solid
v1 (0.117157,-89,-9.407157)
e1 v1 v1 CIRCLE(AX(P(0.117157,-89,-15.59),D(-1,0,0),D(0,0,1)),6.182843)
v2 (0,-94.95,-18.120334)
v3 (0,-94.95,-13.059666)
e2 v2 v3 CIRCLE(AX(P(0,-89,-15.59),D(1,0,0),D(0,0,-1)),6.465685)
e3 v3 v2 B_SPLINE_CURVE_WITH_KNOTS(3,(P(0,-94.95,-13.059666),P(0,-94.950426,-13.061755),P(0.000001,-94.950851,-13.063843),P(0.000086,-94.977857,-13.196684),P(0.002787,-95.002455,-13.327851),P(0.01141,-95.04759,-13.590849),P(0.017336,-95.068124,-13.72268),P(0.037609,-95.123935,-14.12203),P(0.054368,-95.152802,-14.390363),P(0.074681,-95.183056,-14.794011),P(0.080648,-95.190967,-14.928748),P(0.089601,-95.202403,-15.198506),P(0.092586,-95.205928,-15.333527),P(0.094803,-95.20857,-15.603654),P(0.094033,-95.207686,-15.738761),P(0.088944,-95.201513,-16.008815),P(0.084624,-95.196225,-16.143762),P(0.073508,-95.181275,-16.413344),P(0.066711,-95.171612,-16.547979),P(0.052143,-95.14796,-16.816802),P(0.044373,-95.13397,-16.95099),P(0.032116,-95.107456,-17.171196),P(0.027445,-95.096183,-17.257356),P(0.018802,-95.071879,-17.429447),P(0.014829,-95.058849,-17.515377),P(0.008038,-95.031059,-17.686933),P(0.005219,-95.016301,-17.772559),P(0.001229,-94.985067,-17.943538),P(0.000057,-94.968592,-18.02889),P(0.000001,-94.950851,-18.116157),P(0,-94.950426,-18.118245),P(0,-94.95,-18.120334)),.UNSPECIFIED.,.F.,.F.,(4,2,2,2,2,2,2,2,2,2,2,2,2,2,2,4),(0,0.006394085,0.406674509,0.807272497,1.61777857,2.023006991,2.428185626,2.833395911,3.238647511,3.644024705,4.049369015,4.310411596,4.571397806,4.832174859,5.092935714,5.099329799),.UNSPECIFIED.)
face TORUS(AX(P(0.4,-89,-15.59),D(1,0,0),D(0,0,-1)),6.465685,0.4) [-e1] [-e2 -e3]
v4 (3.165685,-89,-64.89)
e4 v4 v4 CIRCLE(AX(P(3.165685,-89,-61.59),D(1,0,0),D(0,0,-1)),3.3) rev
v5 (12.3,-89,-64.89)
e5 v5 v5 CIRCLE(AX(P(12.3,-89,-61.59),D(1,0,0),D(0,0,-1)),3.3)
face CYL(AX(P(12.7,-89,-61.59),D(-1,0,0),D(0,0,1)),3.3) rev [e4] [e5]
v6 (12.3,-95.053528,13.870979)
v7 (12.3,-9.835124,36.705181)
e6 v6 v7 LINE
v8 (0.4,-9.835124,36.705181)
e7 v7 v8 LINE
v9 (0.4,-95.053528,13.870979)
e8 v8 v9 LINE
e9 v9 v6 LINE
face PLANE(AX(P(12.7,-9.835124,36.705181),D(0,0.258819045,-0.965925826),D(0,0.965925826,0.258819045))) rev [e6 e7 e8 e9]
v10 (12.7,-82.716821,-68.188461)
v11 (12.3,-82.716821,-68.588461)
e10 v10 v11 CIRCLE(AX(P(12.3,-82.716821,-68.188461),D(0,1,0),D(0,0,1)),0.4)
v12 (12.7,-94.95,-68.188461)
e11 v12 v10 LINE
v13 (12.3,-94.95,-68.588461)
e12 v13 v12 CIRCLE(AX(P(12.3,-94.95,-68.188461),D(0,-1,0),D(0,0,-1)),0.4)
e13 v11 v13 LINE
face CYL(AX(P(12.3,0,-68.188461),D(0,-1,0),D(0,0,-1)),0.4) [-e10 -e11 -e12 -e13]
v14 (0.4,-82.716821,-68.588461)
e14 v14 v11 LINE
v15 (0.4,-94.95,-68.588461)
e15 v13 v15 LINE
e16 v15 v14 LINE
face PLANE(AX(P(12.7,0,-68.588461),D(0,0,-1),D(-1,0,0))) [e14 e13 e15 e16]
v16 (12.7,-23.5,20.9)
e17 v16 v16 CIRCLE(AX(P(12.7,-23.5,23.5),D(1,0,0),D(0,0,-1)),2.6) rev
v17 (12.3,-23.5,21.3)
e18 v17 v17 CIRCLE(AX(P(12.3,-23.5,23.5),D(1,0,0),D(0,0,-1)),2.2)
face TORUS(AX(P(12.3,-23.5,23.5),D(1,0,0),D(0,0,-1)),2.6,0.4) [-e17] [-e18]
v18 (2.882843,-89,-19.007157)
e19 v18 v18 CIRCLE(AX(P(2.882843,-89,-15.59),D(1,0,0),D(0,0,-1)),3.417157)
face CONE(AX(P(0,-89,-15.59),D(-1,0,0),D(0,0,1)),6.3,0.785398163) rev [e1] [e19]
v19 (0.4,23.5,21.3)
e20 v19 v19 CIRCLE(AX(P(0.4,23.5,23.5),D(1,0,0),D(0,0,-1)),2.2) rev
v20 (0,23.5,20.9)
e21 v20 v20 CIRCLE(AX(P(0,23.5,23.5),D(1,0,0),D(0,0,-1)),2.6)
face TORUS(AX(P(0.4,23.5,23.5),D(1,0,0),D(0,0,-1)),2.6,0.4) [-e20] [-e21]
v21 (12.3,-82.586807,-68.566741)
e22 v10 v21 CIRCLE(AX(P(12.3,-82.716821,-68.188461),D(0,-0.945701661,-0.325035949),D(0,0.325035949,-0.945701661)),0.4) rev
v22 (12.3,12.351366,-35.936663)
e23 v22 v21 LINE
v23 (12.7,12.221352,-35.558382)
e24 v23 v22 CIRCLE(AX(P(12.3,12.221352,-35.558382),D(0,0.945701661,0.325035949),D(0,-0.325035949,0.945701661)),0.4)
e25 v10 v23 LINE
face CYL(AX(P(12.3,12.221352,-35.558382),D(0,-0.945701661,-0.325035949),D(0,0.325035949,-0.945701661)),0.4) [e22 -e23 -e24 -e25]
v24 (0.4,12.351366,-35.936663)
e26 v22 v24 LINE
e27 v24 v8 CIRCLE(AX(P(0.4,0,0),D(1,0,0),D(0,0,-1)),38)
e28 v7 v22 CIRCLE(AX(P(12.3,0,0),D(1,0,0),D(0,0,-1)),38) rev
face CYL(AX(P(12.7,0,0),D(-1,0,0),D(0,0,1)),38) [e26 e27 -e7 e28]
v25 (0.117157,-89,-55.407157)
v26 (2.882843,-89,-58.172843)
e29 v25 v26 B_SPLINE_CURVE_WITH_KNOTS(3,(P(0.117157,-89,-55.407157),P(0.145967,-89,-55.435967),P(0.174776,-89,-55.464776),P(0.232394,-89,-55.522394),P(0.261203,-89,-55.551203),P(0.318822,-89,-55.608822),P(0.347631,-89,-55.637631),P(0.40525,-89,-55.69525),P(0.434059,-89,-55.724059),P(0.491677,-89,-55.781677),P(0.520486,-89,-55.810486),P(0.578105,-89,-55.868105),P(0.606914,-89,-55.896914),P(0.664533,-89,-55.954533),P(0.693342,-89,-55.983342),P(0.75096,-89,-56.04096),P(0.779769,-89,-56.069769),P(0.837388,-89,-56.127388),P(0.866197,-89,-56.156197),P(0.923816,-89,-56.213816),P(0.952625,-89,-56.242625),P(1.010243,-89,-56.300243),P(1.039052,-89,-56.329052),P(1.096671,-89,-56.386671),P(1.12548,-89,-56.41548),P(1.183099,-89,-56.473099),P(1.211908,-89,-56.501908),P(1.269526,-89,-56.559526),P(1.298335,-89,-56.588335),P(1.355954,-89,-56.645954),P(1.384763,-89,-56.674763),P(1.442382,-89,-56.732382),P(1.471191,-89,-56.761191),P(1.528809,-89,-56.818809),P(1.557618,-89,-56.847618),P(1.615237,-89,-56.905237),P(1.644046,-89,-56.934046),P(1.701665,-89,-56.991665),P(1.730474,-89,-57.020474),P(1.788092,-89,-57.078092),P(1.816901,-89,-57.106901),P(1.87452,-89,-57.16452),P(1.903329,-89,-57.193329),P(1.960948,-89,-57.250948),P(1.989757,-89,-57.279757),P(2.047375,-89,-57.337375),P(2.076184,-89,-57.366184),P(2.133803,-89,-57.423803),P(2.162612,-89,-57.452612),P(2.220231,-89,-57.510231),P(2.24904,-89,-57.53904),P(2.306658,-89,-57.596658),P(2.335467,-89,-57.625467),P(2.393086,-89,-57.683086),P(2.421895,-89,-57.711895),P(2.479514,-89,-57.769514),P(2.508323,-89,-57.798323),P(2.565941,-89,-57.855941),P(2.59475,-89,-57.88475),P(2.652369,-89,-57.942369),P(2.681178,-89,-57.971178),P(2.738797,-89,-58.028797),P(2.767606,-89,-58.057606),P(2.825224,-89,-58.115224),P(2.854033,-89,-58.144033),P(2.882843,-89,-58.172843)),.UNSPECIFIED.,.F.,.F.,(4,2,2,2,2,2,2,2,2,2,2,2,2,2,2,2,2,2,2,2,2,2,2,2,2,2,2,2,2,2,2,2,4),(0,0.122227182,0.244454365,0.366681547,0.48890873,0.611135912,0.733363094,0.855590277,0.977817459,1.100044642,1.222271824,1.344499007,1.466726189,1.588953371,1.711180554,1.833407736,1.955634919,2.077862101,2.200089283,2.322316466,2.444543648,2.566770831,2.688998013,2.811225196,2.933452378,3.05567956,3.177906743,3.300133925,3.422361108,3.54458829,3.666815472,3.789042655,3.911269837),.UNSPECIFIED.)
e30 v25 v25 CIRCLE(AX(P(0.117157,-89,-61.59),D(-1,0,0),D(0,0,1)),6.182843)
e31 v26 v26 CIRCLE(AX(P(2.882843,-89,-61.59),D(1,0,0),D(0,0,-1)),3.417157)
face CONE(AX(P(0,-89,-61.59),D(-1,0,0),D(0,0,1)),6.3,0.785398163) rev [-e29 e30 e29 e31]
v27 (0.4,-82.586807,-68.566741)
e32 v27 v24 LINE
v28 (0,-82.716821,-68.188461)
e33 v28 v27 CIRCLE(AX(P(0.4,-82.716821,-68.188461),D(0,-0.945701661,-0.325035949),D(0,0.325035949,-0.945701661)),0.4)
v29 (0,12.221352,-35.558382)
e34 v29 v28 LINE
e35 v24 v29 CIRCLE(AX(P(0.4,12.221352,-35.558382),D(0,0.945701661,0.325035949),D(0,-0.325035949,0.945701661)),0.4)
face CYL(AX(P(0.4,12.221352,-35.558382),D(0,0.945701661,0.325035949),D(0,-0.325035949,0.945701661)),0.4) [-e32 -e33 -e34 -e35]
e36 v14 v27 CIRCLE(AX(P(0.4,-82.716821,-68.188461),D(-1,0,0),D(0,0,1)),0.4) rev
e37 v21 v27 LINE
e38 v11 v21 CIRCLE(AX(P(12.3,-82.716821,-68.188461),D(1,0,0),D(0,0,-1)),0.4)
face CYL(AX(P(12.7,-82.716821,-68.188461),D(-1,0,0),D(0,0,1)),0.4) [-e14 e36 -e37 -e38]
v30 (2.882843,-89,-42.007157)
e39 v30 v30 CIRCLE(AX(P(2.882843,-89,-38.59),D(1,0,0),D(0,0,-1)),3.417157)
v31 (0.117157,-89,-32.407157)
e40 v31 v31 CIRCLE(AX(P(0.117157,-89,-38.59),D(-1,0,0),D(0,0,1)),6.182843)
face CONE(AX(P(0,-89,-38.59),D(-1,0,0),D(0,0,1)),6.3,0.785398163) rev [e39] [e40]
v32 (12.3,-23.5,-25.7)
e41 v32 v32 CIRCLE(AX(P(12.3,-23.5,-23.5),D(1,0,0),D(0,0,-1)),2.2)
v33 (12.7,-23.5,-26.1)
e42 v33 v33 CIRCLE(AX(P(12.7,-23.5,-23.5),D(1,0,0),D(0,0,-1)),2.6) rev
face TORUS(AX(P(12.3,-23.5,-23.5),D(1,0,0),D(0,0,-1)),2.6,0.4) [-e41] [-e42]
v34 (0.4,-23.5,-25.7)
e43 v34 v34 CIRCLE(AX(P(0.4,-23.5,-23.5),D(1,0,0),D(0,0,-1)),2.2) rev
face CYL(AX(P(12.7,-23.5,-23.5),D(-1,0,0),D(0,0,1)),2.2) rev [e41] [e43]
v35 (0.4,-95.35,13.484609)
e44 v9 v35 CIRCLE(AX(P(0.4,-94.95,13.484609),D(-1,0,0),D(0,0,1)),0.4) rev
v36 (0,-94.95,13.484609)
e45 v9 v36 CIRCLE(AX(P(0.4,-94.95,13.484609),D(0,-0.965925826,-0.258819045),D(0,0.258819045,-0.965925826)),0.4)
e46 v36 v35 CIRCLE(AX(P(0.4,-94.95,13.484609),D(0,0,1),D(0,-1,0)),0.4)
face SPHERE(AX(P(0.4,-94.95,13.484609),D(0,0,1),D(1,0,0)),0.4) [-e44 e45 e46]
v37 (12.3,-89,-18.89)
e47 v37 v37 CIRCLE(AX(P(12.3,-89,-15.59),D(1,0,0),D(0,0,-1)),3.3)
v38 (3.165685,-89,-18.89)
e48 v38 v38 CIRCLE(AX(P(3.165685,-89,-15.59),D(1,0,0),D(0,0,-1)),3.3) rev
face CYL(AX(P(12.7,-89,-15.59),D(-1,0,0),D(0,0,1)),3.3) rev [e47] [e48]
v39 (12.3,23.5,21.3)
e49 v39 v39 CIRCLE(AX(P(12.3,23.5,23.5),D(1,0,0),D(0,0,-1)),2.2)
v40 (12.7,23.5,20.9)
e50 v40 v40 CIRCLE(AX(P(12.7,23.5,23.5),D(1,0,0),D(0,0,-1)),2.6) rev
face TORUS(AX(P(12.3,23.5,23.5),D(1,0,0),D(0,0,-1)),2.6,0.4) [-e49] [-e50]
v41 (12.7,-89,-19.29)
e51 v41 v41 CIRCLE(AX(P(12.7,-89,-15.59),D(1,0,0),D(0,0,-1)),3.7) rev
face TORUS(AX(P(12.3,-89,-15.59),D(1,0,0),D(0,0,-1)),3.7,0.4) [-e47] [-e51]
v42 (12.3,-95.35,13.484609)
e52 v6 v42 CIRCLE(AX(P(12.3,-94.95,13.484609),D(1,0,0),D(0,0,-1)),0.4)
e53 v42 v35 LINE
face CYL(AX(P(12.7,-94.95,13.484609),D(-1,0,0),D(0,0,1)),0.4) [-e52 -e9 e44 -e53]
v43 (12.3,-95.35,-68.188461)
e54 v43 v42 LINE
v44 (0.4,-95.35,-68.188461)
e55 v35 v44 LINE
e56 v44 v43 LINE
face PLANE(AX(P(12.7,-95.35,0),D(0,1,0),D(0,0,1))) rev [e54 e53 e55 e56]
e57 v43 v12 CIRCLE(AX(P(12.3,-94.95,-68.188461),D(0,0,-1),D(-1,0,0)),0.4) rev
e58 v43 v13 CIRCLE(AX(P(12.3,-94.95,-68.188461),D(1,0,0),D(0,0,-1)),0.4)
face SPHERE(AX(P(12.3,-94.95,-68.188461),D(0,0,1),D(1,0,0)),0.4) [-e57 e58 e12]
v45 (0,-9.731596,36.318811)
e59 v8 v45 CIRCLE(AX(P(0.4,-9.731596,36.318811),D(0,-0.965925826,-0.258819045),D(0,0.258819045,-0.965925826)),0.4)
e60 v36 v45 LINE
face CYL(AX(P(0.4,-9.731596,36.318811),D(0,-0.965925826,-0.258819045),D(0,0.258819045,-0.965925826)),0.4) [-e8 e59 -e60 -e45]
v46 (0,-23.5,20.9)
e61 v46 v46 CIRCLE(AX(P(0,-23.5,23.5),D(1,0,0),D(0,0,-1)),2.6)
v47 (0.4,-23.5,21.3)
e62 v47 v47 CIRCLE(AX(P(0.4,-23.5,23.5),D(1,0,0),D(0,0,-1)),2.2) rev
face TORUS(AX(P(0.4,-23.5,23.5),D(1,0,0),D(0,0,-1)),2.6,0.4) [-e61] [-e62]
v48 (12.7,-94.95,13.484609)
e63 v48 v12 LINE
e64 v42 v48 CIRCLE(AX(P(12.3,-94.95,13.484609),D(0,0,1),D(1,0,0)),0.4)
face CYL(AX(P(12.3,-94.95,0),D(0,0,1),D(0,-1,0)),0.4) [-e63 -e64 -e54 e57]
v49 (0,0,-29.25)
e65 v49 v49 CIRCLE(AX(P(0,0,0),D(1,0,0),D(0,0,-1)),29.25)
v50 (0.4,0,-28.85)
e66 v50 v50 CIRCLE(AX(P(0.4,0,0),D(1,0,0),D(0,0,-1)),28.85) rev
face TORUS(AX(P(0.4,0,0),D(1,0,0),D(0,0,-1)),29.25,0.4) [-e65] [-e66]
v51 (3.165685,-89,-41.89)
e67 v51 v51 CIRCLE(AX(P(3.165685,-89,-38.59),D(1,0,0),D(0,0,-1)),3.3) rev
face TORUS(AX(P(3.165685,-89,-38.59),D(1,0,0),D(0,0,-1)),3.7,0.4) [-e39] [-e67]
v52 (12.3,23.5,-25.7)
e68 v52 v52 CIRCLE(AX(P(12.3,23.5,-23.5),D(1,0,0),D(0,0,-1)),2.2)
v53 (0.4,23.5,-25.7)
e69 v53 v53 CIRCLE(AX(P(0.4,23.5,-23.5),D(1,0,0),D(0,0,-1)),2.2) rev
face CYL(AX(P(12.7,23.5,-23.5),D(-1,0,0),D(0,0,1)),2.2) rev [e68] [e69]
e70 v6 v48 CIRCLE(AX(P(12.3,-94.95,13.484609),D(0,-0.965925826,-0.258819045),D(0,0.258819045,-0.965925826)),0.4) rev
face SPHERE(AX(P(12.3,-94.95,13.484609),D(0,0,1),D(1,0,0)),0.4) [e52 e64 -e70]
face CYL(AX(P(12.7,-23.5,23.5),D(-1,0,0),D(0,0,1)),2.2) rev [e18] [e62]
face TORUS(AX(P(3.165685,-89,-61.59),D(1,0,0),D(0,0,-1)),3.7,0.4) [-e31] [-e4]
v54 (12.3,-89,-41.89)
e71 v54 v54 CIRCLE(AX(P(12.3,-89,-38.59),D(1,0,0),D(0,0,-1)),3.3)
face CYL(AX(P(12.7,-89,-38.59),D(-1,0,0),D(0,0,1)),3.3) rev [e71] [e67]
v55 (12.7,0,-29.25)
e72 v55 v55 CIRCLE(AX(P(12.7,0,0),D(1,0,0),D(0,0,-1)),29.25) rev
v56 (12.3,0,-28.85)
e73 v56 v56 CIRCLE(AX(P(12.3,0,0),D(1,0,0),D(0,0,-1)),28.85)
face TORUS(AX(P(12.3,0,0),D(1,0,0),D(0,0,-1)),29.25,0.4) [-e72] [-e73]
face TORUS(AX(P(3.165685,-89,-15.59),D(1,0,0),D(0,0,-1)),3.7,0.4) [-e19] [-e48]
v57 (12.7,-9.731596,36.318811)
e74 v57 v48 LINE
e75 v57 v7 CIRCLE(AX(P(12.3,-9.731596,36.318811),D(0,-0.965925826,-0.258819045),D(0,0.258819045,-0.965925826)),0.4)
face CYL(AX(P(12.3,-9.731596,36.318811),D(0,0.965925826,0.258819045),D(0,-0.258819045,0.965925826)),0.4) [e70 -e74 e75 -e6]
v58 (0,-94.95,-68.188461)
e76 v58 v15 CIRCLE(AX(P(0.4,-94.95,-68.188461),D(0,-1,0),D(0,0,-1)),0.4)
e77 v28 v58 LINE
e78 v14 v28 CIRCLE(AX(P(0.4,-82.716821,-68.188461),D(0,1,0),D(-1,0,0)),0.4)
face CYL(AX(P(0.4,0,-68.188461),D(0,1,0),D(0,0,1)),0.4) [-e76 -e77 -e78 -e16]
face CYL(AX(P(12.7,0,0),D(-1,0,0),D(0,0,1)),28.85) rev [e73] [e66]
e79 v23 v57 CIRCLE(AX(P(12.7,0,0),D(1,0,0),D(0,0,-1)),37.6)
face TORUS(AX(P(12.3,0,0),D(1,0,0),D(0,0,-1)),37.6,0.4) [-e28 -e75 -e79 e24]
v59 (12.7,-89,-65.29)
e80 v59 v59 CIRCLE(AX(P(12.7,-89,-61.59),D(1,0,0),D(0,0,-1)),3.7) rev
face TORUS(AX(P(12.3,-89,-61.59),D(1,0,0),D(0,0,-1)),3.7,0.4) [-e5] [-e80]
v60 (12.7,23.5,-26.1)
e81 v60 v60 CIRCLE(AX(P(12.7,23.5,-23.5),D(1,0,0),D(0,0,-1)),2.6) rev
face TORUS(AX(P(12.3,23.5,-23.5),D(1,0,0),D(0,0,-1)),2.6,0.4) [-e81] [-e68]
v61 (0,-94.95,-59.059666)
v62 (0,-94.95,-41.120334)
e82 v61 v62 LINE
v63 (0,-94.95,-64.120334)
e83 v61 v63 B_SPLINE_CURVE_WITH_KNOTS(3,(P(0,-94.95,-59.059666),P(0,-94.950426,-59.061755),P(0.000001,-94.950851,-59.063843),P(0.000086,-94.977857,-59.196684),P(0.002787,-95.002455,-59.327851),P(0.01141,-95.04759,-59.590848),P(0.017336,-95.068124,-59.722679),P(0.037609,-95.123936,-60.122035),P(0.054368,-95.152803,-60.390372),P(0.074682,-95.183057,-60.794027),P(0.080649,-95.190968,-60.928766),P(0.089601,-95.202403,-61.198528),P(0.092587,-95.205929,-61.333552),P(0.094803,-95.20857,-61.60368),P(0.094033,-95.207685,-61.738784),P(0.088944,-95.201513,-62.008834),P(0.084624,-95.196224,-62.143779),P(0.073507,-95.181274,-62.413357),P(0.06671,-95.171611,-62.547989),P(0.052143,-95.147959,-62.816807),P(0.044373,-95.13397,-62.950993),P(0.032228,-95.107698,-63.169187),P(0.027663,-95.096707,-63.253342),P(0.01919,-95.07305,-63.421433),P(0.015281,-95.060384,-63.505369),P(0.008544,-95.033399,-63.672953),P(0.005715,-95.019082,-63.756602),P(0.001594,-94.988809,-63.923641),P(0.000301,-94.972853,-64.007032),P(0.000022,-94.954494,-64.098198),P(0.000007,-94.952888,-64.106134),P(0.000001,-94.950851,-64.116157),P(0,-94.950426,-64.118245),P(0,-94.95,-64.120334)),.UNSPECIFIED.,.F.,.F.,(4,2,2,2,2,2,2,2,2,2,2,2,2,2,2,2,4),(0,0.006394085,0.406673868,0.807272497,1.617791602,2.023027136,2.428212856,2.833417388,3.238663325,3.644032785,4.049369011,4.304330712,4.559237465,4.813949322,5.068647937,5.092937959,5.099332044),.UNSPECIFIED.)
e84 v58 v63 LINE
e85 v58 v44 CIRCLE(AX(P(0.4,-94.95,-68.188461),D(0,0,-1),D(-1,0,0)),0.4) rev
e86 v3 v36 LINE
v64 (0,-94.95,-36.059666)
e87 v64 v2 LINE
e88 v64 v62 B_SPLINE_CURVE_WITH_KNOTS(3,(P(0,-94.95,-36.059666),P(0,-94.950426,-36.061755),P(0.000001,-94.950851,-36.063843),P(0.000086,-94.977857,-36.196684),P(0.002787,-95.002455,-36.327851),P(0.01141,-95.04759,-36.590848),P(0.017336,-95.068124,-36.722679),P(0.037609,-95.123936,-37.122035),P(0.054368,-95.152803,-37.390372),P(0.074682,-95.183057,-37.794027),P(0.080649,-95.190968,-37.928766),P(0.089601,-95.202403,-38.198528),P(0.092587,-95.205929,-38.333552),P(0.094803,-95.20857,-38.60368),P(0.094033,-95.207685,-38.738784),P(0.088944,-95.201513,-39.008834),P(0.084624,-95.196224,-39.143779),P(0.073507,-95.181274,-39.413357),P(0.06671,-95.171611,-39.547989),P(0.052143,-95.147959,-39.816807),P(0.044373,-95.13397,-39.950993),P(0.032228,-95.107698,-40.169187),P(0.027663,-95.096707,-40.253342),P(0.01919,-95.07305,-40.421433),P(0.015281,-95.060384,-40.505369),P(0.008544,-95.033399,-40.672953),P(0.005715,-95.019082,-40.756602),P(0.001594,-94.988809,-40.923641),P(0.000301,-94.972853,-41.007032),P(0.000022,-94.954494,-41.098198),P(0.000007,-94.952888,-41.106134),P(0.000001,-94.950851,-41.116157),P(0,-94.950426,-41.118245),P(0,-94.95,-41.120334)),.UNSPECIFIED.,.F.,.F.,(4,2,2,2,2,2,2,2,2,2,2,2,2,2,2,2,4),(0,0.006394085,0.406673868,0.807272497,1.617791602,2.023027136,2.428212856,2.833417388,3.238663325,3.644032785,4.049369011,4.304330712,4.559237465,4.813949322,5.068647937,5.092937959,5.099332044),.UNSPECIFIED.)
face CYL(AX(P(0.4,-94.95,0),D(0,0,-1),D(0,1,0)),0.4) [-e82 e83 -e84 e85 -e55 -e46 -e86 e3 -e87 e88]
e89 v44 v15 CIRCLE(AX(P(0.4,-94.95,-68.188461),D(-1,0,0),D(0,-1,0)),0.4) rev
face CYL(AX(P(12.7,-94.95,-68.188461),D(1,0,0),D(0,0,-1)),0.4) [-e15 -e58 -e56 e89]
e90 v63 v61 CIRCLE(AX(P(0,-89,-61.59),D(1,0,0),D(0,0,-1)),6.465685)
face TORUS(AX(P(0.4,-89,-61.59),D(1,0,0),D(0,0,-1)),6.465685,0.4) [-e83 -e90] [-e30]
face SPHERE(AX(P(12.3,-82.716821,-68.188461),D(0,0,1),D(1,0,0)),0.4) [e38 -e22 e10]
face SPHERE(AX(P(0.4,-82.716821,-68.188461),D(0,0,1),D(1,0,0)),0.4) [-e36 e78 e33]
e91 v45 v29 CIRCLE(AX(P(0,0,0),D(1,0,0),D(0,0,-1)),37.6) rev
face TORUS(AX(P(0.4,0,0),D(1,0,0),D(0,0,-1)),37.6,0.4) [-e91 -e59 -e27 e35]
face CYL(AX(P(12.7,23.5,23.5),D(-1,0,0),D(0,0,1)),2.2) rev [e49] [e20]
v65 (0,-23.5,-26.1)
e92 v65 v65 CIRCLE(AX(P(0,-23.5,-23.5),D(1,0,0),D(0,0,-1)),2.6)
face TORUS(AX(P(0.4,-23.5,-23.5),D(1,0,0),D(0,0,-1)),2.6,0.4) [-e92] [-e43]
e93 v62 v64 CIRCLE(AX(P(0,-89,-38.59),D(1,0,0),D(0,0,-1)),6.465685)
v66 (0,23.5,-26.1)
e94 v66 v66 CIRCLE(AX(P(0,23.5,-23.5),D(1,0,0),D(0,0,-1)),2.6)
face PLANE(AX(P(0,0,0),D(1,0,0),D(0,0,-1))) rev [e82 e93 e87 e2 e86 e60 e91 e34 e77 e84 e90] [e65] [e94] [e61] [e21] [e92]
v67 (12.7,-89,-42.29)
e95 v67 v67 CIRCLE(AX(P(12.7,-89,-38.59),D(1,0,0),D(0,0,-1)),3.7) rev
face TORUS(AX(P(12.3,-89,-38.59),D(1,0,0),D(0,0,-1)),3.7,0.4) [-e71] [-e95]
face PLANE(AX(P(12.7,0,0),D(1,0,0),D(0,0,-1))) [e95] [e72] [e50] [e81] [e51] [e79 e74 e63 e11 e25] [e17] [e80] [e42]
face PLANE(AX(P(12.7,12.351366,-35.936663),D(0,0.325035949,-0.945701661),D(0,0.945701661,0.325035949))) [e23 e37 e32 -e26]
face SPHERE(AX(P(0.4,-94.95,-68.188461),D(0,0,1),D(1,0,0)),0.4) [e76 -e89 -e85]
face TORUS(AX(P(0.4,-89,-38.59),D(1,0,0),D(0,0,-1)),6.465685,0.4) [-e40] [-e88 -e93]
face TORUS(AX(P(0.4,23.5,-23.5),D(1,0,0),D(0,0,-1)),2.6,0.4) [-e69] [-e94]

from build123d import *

# Parameters (mm, degrees)
SKETCH1_R           = 38
SKETCH1_R_2         = 2.2
SKETCH1_R_3         = 28.85
SKETCH1_R_4         = 3.3
BOSS_EXTRUDE1_DEPTH = 12.7
CHAMFER1_SIZE       = 3
FILLET1_R           = 0.4


with BuildPart() as part:
    # Sketch1 → Boss-Extrude1 (new body)
    # profile 1 of 2: a face of its own
    with BuildSketch(Plane(origin=(0, 0, 0), x_dir=(0, 0, -1), z_dir=(1, 0, 0))):
        Circle(SKETCH1_R)
        with Locations((23.5, -23.5)):
            Circle(SKETCH1_R_2, mode=Mode.SUBTRACT)
        with Locations((-23.5, -23.5)):
            Circle(SKETCH1_R_2, mode=Mode.SUBTRACT)
        with Locations((23.5, 23.5)):
            Circle(SKETCH1_R_2, mode=Mode.SUBTRACT)
        with Locations((-23.5, 23.5)):
            Circle(SKETCH1_R_2, mode=Mode.SUBTRACT)
        Circle(SKETCH1_R_3, mode=Mode.SUBTRACT)
    # profile 2 of 2: a face of its own
    with BuildSketch(Plane(origin=(0, 0, 0), x_dir=(0, 0, -1), z_dir=(1, 0, 0))):
        with BuildLine():
            ThreePointArc((38, 0), (4.959995304, -37.674904732), (-36.705181399, -9.835123714))
            Line((-36.705181399, -9.835123714), (-13.791539357, -95.35))
            Line((-13.791539357, -95.35), (68.588460643, -95.35))
            Line((68.588460643, -95.35), (68.588460643, -82.65))
            Line((68.588460643, -82.65), (35.936663125, 12.351366055))
            ThreePointArc((35.936663125, 12.351366055), (37.480616315, 6.261261903), (38, 0))
        make_face()
        with Locations((15.59, -89)):
            Circle(SKETCH1_R_4, mode=Mode.SUBTRACT)
        with Locations((38.59, -89)):
            Circle(SKETCH1_R_4, mode=Mode.SUBTRACT)
        with Locations((61.59, -89)):
            Circle(SKETCH1_R_4, mode=Mode.SUBTRACT)
    extrude(amount=BOSS_EXTRUDE1_DEPTH)

    # Chamfer1
    chamfer1_edges = [part.edges().sort_by_distance(p)[0] for p in [
        (0, -89, -58.29),
        (0, -89, -35.29),
        (0, -89, -12.29),
    ]]
    chamfer(chamfer1_edges, length=CHAMFER1_SIZE)

    # Fillet1
    # the kernel refuses this fillet: 0.4 mm, written as the material it takes off along each edge
    with BuildSketch(Plane(origin=(12.3, -82.716821333, -68.188460643), x_dir=(0, 0, -1), z_dir=(1, 0, 0))) as fillet1_piece_1_section:
        Polygon((0, 0), (FILLET1_R * 1.02, 0), (FILLET1_R * 1.02, FILLET1_R * 0.170394400329), (FILLET1_R * 0.964615694418, FILLET1_R * 0.331536667779), align=None)
    fillet1_piece_1 = extrude(amount=FILLET1_R * 1.02, mode=Mode.PRIVATE)
    fillet1_piece_1 = fillet1_piece_1 - Plane(origin=(12.3, -82.716821333, -68.188460643), x_dir=(0, -0.16477005007846748, 0.9863320083000142), z_dir=(1, 0, 0)) * Sphere(FILLET1_R, mode=Mode.PRIVATE)
    add(fillet1_piece_1, mode=Mode.SUBTRACT)
    with BuildSketch(Plane(origin=(0.4, -94.95, -68.188460643), x_dir=(0, -1, 0), z_dir=(-1, 0, 0))) as fillet1_piece_2_section:
        Polygon((0, 0), (FILLET1_R * 1.02, 0), (FILLET1_R * 1.02, -FILLET1_R * 1.02), (0, -FILLET1_R * 1.02), align=None)
    fillet1_piece_2 = extrude(amount=FILLET1_R * 1.02, mode=Mode.PRIVATE)
    fillet1_piece_2 = fillet1_piece_2 - Plane(origin=(0.4, -94.95, -68.188460643), x_dir=(0, 0.7071067811865476, 0.7071067811865475), z_dir=(-1, 0, 0)) * Sphere(FILLET1_R, mode=Mode.PRIVATE)
    add(fillet1_piece_2, mode=Mode.SUBTRACT)
    with BuildSketch(Plane(origin=(0.4, -82.716821333, -68.188460643), x_dir=(0, 0, -1), z_dir=(-1, 0, 0))) as fillet1_piece_3_section:
        Polygon((0, 0), (FILLET1_R * 1.02, 0), (FILLET1_R * 1.02, -FILLET1_R * 0.170394400329), (FILLET1_R * 0.964615694418, -FILLET1_R * 0.331536667779), align=None)
    fillet1_piece_3 = extrude(amount=FILLET1_R * 1.02, mode=Mode.PRIVATE)
    fillet1_piece_3 = fillet1_piece_3 - Plane(origin=(0.4, -82.716821333, -68.188460643), x_dir=(0, -0.16477005007846748, 0.9863320083000142), z_dir=(-1, 0, 0)) * Sphere(FILLET1_R, mode=Mode.PRIVATE)
    add(fillet1_piece_3, mode=Mode.SUBTRACT)
    with BuildSketch(Plane(origin=(0.4, -94.95, 13.484608562), x_dir=(0, -0.25881904510251824, 0.9659258262890691), z_dir=(-1, 0, 0))) as fillet1_piece_4_section:
        Polygon((0, 0), (FILLET1_R * 1.02, 0), (FILLET1_R * 1.02, -FILLET1_R * 0.782673527739), (FILLET1_R * 0.263995426005, -FILLET1_R * 0.985244342815), align=None)
    fillet1_piece_4 = extrude(amount=FILLET1_R * 1.02, mode=Mode.PRIVATE)
    fillet1_piece_4 = fillet1_piece_4 - Plane(origin=(0.4, -94.95, 13.484608562), x_dir=(0, 0.7933533402912343, -0.6087614290087218), z_dir=(-1, 0, 0)) * Sphere(FILLET1_R, mode=Mode.PRIVATE)
    add(fillet1_piece_4, mode=Mode.SUBTRACT)
    with BuildSketch(Plane(origin=(12.3, -94.95, 13.484608562), x_dir=(0, -0.25881904510251824, 0.9659258262890691), z_dir=(1, 0, 0))) as fillet1_piece_5_section:
        Polygon((0, 0), (FILLET1_R * 1.02, 0), (FILLET1_R * 1.02, FILLET1_R * 0.782673527739), (FILLET1_R * 0.263995426005, FILLET1_R * 0.985244342815), align=None)
    fillet1_piece_5 = extrude(amount=FILLET1_R * 1.02, mode=Mode.PRIVATE)
    fillet1_piece_5 = fillet1_piece_5 - Plane(origin=(12.3, -94.95, 13.484608562), x_dir=(0, 0.7933533402912343, -0.6087614290087218), z_dir=(1, 0, 0)) * Sphere(FILLET1_R, mode=Mode.PRIVATE)
    add(fillet1_piece_5, mode=Mode.SUBTRACT)
    with BuildSketch(Plane(origin=(12.3, -94.95, -68.188460643), x_dir=(0, 0, -1), z_dir=(0, -1, 0))) as fillet1_piece_6_section:
        Polygon((0, 0), (FILLET1_R * 1.02, 0), (FILLET1_R * 1.02, FILLET1_R * 1.02), (0, FILLET1_R * 1.02), align=None)
    fillet1_piece_6 = extrude(amount=FILLET1_R * 1.02, mode=Mode.PRIVATE)
    fillet1_piece_6 = fillet1_piece_6 - Plane(origin=(12.3, -94.95, -68.188460643), x_dir=(-0.7071067811865475, 0, 0.7071067811865475), z_dir=(0, -1, 0)) * Sphere(FILLET1_R, mode=Mode.PRIVATE)
    add(fillet1_piece_6, mode=Mode.SUBTRACT)
    with BuildSketch(Plane(origin=(12.7, -82.586806954, -68.566741307), x_dir=(-1, 0, 0), z_dir=(0, 0.9457016611942787, 0.3250359488031775)), Plane(origin=(0, -82.586806954, -68.566741307), x_dir=(0, -0.3250359488031775, 0.9457016611942787), z_dir=(0, 0.9457016611942787, 0.3250359488031775))) as fillet1_piece_7:
        with BuildLine():
            CenterArc((FILLET1_R, FILLET1_R), FILLET1_R, 180, 90)
            Line((0, FILLET1_R), (0, 0))
            Line((0, 0), (FILLET1_R, 0))
        make_face()
    extrude(amount=100.389136346, mode=Mode.SUBTRACT)
    with BuildSketch(Plane(origin=(12.7, 0, 0), x_dir=(0, 0.3250359488031776, -0.9457016611942786), z_dir=(0, -0.9457016611942786, -0.3250359488031776))) as fillet1_piece_8:
        with BuildLine():
            CenterArc((38 - FILLET1_R, -FILLET1_R), FILLET1_R, 0, 90)
            Line((38 - FILLET1_R, 0), (38, 0))
            Line((38, 0), (38, -FILLET1_R))
        make_face()
    revolve(axis=Axis((12.7, 0, 0), (1, 0, 0)), revolution_arc=176.03224705, mode=Mode.SUBTRACT)
    with BuildSketch(Plane(origin=(0, 0, 0), x_dir=(0, 0, -1), z_dir=(0, -1, 0))) as fillet1_piece_9:
        with BuildLine():
            CenterArc((28.85 + FILLET1_R, FILLET1_R), FILLET1_R, 180, 90)
            Line((28.85, FILLET1_R), (28.85, 0))
            Line((28.85, 0), (28.85 + FILLET1_R, 0))
        make_face()
    revolve(axis=Axis((0, 0, 0), (1, 0, 0)), mode=Mode.SUBTRACT)
    with BuildSketch(Plane(origin=(0, 23.5, 23.5), x_dir=(0, 0, -1), z_dir=(0, -1, 0))) as fillet1_piece_10:
        with BuildLine():
            CenterArc((2.2 + FILLET1_R, FILLET1_R), FILLET1_R, 180, 90)
            Line((2.2, FILLET1_R), (2.2, 0))
            Line((2.2, 0), (2.2 + FILLET1_R, 0))
        make_face()
    revolve(axis=Axis((0, 23.5, 23.5), (1, 0, 0)), mode=Mode.SUBTRACT)
    with BuildSketch(Plane(origin=(0, 23.5, -23.5), x_dir=(0, 0, -1), z_dir=(0, -1, 0))) as fillet1_piece_11:
        with BuildLine():
            CenterArc((2.2 + FILLET1_R, FILLET1_R), FILLET1_R, 180, 90)
            Line((2.2, FILLET1_R), (2.2, 0))
            Line((2.2, 0), (2.2 + FILLET1_R, 0))
        make_face()
    revolve(axis=Axis((0, 23.5, -23.5), (1, 0, 0)), mode=Mode.SUBTRACT)
    with BuildSketch(Plane(origin=(0, -23.5, 23.5), x_dir=(0, 0, -1), z_dir=(0, -1, 0))) as fillet1_piece_12:
        with BuildLine():
            CenterArc((2.2 + FILLET1_R, FILLET1_R), FILLET1_R, 180, 90)
            Line((2.2, FILLET1_R), (2.2, 0))
            Line((2.2, 0), (2.2 + FILLET1_R, 0))
        make_face()
    revolve(axis=Axis((0, -23.5, 23.5), (1, 0, 0)), mode=Mode.SUBTRACT)
    with BuildSketch(Plane(origin=(0, -23.5, -23.5), x_dir=(0, 0, -1), z_dir=(0, -1, 0))) as fillet1_piece_13:
        with BuildLine():
            CenterArc((2.2 + FILLET1_R, FILLET1_R), FILLET1_R, 180, 90)
            Line((2.2, FILLET1_R), (2.2, 0))
            Line((2.2, 0), (2.2 + FILLET1_R, 0))
        make_face()
    revolve(axis=Axis((0, -23.5, -23.5), (1, 0, 0)), mode=Mode.SUBTRACT)
    with BuildSketch(Plane(origin=(0, -94.95, -68.588460643), x_dir=(0, 0, 1), z_dir=(0, 1, 0)), Plane(origin=(12.7, -94.95, -68.588460643), x_dir=(-1, 0, 0), z_dir=(0, 1, 0))) as fillet1_piece_14:
        with BuildLine():
            CenterArc((FILLET1_R, FILLET1_R), FILLET1_R, 180, 90)
            Line((0, FILLET1_R), (0, 0))
            Line((0, 0), (FILLET1_R, 0))
        make_face()
    extrude(amount=12.233178667, mode=Mode.SUBTRACT)
    with BuildSketch(Plane(origin=(0, -95.35, 13.484608562), x_dir=(0, 1, 0), z_dir=(0, 0, -1)), Plane(origin=(12.7, -95.35, 13.484608562), x_dir=(-1, 0, 0), z_dir=(0, 0, -1))) as fillet1_piece_15:
        with BuildLine():
            CenterArc((FILLET1_R, FILLET1_R), FILLET1_R, 180, 90)
            Line((0, FILLET1_R), (0, 0))
            Line((0, 0), (FILLET1_R, 0))
        make_face()
    extrude(amount=81.673069205, mode=Mode.SUBTRACT)
    with BuildSketch(Plane(origin=(0, -9.835123714, 36.705181399), x_dir=(0, 0.25881904510251824, -0.965925826289069), z_dir=(0, -0.9659258262890691, -0.25881904510251824)), Plane(origin=(12.7, -9.835123714, 36.705181399), x_dir=(-1, 0, 0), z_dir=(0, -0.9659258262890691, -0.25881904510251824))) as fillet1_piece_16:
        with BuildLine():
            CenterArc((FILLET1_R, FILLET1_R), FILLET1_R, 180, 90)
            Line((0, FILLET1_R), (0, 0))
            Line((0, 0), (FILLET1_R, 0))
        make_face()
    extrude(amount=88.224583695, mode=Mode.SUBTRACT)
    with BuildSketch(Plane(origin=(0, 0, 0), x_dir=(0, 0.3250359488031776, -0.9457016611942786), z_dir=(0, -0.9457016611942786, -0.3250359488031776))) as fillet1_piece_17:
        with BuildLine():
            CenterArc((38 - FILLET1_R, FILLET1_R), FILLET1_R, 270, 90)
            Line((38, FILLET1_R), (38, 0))
            Line((38, 0), (38 - FILLET1_R, 0))
        make_face()
    revolve(axis=Axis((0, 0, 0), (1, 0, 0)), revolution_arc=176.03224705, mode=Mode.SUBTRACT)
    with BuildSketch(Plane(origin=(0.4, -82.65, -68.588460643), x_dir=(0, -1, 0), z_dir=(1, 0, 0))) as fillet1_piece_18:
        with BuildLine():
            CenterArc((FILLET1_R * 0.167053333656, -FILLET1_R), FILLET1_R, 90, 18.96775295)
            Line((-FILLET1_R * 0.157982615147, -FILLET1_R * 0.0542983388057), (0, 0))
            Line((0, 0), (FILLET1_R * 0.167053333656, 0))
        make_face()
    extrude(amount=11.9, mode=Mode.SUBTRACT)
    with BuildSketch(Plane(origin=(0.4, -95.35, -68.588460643), x_dir=(0, 0, 1), z_dir=(1, 0, 0))) as fillet1_piece_19:
        with BuildLine():
            CenterArc((FILLET1_R, -FILLET1_R), FILLET1_R, 90, 90)
            Line((0, -FILLET1_R), (0, 0))
            Line((0, 0), (FILLET1_R, 0))
        make_face()
    extrude(amount=11.9, mode=Mode.SUBTRACT)
    with BuildSketch(Plane(origin=(0.4, -95.35, 13.791539357), x_dir=(0, 0.9659258262890705, 0.25881904510251247), z_dir=(1, 0, 0))) as fillet1_piece_20:
        with BuildLine():
            CenterArc((FILLET1_R * 0.767326987979, -FILLET1_R), FILLET1_R, 90, 75)
            Line((-FILLET1_R * 0.19859883831, -FILLET1_R * 0.741180954897), (0, 0))
            Line((0, 0), (FILLET1_R * 0.767326987979, 0))
        make_face()
    extrude(amount=11.9, mode=Mode.SUBTRACT)
    with BuildSketch(Plane(origin=(12.7, -23.5, -23.5), x_dir=(0, 0, -1), z_dir=(0, -1, 0))) as fillet1_piece_21:
        with BuildLine():
            CenterArc((2.2 + FILLET1_R, -FILLET1_R), FILLET1_R, 90, 90)
            Line((2.2 + FILLET1_R, 0), (2.2, 0))
            Line((2.2, 0), (2.2, -FILLET1_R))
        make_face()
    revolve(axis=Axis((12.7, -23.5, -23.5), (1, 0, 0)), mode=Mode.SUBTRACT)
    with BuildSketch(Plane(origin=(12.7, -23.5, 23.5), x_dir=(0, 0, -1), z_dir=(0, -1, 0))) as fillet1_piece_22:
        with BuildLine():
            CenterArc((2.2 + FILLET1_R, -FILLET1_R), FILLET1_R, 90, 90)
            Line((2.2 + FILLET1_R, 0), (2.2, 0))
            Line((2.2, 0), (2.2, -FILLET1_R))
        make_face()
    revolve(axis=Axis((12.7, -23.5, 23.5), (1, 0, 0)), mode=Mode.SUBTRACT)
    with BuildSketch(Plane(origin=(0, -89, -61.59), x_dir=(0, 0, -1), z_dir=(0, -1, 0))) as fillet1_piece_23:
        with BuildLine():
            CenterArc((6.3 + FILLET1_R * 0.414213562373, FILLET1_R), FILLET1_R, 225, 45)
            Line((6.3 - FILLET1_R * 0.292893218813, FILLET1_R * 0.292893218813), (6.3, 0))
            Line((6.3, 0), (6.3 + FILLET1_R * 0.414213562373, 0))
        make_face()
    revolve(axis=Axis((0, -89, -61.59), (1, 0, 0)), mode=Mode.SUBTRACT)
    with BuildSketch(Plane(origin=(0, -89, -38.59), x_dir=(0, 0, -1), z_dir=(0, -1, 0))) as fillet1_piece_24:
        with BuildLine():
            CenterArc((6.3 + FILLET1_R * 0.414213562373, FILLET1_R), FILLET1_R, 225, 45)
            Line((6.3 - FILLET1_R * 0.292893218813, FILLET1_R * 0.292893218813), (6.3, 0))
            Line((6.3, 0), (6.3 + FILLET1_R * 0.414213562373, 0))
        make_face()
    revolve(axis=Axis((0, -89, -38.59), (1, 0, 0)), mode=Mode.SUBTRACT)
    with BuildSketch(Plane(origin=(12.7, 23.5, -23.5), x_dir=(0, 0, -1), z_dir=(0, -1, 0))) as fillet1_piece_25:
        with BuildLine():
            CenterArc((2.2 + FILLET1_R, -FILLET1_R), FILLET1_R, 90, 90)
            Line((2.2 + FILLET1_R, 0), (2.2, 0))
            Line((2.2, 0), (2.2, -FILLET1_R))
        make_face()
    revolve(axis=Axis((12.7, 23.5, -23.5), (1, 0, 0)), mode=Mode.SUBTRACT)
    with BuildSketch(Plane(origin=(0, -89, -15.59), x_dir=(0, 0, -1), z_dir=(0, -1, 0))) as fillet1_piece_26:
        with BuildLine():
            CenterArc((6.3 + FILLET1_R * 0.414213562373, FILLET1_R), FILLET1_R, 225, 45)
            Line((6.3 - FILLET1_R * 0.292893218813, FILLET1_R * 0.292893218813), (6.3, 0))
            Line((6.3, 0), (6.3 + FILLET1_R * 0.414213562373, 0))
        make_face()
    revolve(axis=Axis((0, -89, -15.59), (1, 0, 0)), mode=Mode.SUBTRACT)
    with BuildSketch(Plane(origin=(3, -89, -15.59), x_dir=(0, 0, -1), z_dir=(0, -1, 0))) as fillet1_piece_27:
        with BuildLine():
            CenterArc((3.3 + FILLET1_R, FILLET1_R * 0.414213562373), FILLET1_R, 180, 45)
            Line((3.3, FILLET1_R * 0.414213562373), (3.3, 0))
            Line((3.3, 0), (3.3 + FILLET1_R * 0.292893218813, -FILLET1_R * 0.292893218813))
        make_face()
    revolve(axis=Axis((3, -89, -15.59), (1, 0, 0)), mode=Mode.SUBTRACT)
    with BuildSketch(Plane(origin=(3, -89, -38.59), x_dir=(0, 0, -1), z_dir=(0, -1, 0))) as fillet1_piece_28:
        with BuildLine():
            CenterArc((3.3 + FILLET1_R, FILLET1_R * 0.414213562373), FILLET1_R, 180, 45)
            Line((3.3, FILLET1_R * 0.414213562373), (3.3, 0))
            Line((3.3, 0), (3.3 + FILLET1_R * 0.292893218813, -FILLET1_R * 0.292893218813))
        make_face()
    revolve(axis=Axis((3, -89, -38.59), (1, 0, 0)), mode=Mode.SUBTRACT)
    with BuildSketch(Plane(origin=(3, -89, -61.59), x_dir=(0, 0, -1), z_dir=(0, -1, 0))) as fillet1_piece_29:
        with BuildLine():
            CenterArc((3.3 + FILLET1_R, FILLET1_R * 0.414213562373), FILLET1_R, 180, 45)
            Line((3.3, FILLET1_R * 0.414213562373), (3.3, 0))
            Line((3.3, 0), (3.3 + FILLET1_R * 0.292893218813, -FILLET1_R * 0.292893218813))
        make_face()
    revolve(axis=Axis((3, -89, -61.59), (1, 0, 0)), mode=Mode.SUBTRACT)
    with BuildSketch(Plane(origin=(12.7, 23.5, 23.5), x_dir=(0, 0, -1), z_dir=(0, -1, 0))) as fillet1_piece_30:
        with BuildLine():
            CenterArc((2.2 + FILLET1_R, -FILLET1_R), FILLET1_R, 90, 90)
            Line((2.2 + FILLET1_R, 0), (2.2, 0))
            Line((2.2, 0), (2.2, -FILLET1_R))
        make_face()
    revolve(axis=Axis((12.7, 23.5, 23.5), (1, 0, 0)), mode=Mode.SUBTRACT)
    with BuildSketch(Plane(origin=(12.7, 0, 0), x_dir=(0, 0, -1), z_dir=(0, -1, 0))) as fillet1_piece_31:
        with BuildLine():
            CenterArc((28.85 + FILLET1_R, -FILLET1_R), FILLET1_R, 90, 90)
            Line((28.85 + FILLET1_R, 0), (28.85, 0))
            Line((28.85, 0), (28.85, -FILLET1_R))
        make_face()
    revolve(axis=Axis((12.7, 0, 0), (1, 0, 0)), mode=Mode.SUBTRACT)
    with BuildSketch(Plane(origin=(12.7, -89, -15.59), x_dir=(0, 0, -1), z_dir=(0, -1, 0))) as fillet1_piece_32:
        with BuildLine():
            CenterArc((3.3 + FILLET1_R, -FILLET1_R), FILLET1_R, 90, 90)
            Line((3.3, -FILLET1_R), (3.3, 0))
            Line((3.3, 0), (3.3 + FILLET1_R, 0))
        make_face()
    revolve(axis=Axis((12.7, -89, -15.59), (1, 0, 0)), mode=Mode.SUBTRACT)
    with BuildSketch(Plane(origin=(12.7, -89, -38.59), x_dir=(0, 0, -1), z_dir=(0, -1, 0))) as fillet1_piece_33:
        with BuildLine():
            CenterArc((3.3 + FILLET1_R, -FILLET1_R), FILLET1_R, 90, 90)
            Line((3.3, -FILLET1_R), (3.3, 0))
            Line((3.3, 0), (3.3 + FILLET1_R, 0))
        make_face()
    revolve(axis=Axis((12.7, -89, -38.59), (1, 0, 0)), mode=Mode.SUBTRACT)
    with BuildSketch(Plane(origin=(12.7, -89, -61.59), x_dir=(0, 0, -1), z_dir=(0, -1, 0))) as fillet1_piece_34:
        with BuildLine():
            CenterArc((3.3 + FILLET1_R, -FILLET1_R), FILLET1_R, 90, 90)
            Line((3.3 + FILLET1_R, 0), (3.3, 0))
            Line((3.3, 0), (3.3, -FILLET1_R))
        make_face()
    revolve(axis=Axis((12.7, -89, -61.59), (1, 0, 0)), mode=Mode.SUBTRACT)


solid = part.part
